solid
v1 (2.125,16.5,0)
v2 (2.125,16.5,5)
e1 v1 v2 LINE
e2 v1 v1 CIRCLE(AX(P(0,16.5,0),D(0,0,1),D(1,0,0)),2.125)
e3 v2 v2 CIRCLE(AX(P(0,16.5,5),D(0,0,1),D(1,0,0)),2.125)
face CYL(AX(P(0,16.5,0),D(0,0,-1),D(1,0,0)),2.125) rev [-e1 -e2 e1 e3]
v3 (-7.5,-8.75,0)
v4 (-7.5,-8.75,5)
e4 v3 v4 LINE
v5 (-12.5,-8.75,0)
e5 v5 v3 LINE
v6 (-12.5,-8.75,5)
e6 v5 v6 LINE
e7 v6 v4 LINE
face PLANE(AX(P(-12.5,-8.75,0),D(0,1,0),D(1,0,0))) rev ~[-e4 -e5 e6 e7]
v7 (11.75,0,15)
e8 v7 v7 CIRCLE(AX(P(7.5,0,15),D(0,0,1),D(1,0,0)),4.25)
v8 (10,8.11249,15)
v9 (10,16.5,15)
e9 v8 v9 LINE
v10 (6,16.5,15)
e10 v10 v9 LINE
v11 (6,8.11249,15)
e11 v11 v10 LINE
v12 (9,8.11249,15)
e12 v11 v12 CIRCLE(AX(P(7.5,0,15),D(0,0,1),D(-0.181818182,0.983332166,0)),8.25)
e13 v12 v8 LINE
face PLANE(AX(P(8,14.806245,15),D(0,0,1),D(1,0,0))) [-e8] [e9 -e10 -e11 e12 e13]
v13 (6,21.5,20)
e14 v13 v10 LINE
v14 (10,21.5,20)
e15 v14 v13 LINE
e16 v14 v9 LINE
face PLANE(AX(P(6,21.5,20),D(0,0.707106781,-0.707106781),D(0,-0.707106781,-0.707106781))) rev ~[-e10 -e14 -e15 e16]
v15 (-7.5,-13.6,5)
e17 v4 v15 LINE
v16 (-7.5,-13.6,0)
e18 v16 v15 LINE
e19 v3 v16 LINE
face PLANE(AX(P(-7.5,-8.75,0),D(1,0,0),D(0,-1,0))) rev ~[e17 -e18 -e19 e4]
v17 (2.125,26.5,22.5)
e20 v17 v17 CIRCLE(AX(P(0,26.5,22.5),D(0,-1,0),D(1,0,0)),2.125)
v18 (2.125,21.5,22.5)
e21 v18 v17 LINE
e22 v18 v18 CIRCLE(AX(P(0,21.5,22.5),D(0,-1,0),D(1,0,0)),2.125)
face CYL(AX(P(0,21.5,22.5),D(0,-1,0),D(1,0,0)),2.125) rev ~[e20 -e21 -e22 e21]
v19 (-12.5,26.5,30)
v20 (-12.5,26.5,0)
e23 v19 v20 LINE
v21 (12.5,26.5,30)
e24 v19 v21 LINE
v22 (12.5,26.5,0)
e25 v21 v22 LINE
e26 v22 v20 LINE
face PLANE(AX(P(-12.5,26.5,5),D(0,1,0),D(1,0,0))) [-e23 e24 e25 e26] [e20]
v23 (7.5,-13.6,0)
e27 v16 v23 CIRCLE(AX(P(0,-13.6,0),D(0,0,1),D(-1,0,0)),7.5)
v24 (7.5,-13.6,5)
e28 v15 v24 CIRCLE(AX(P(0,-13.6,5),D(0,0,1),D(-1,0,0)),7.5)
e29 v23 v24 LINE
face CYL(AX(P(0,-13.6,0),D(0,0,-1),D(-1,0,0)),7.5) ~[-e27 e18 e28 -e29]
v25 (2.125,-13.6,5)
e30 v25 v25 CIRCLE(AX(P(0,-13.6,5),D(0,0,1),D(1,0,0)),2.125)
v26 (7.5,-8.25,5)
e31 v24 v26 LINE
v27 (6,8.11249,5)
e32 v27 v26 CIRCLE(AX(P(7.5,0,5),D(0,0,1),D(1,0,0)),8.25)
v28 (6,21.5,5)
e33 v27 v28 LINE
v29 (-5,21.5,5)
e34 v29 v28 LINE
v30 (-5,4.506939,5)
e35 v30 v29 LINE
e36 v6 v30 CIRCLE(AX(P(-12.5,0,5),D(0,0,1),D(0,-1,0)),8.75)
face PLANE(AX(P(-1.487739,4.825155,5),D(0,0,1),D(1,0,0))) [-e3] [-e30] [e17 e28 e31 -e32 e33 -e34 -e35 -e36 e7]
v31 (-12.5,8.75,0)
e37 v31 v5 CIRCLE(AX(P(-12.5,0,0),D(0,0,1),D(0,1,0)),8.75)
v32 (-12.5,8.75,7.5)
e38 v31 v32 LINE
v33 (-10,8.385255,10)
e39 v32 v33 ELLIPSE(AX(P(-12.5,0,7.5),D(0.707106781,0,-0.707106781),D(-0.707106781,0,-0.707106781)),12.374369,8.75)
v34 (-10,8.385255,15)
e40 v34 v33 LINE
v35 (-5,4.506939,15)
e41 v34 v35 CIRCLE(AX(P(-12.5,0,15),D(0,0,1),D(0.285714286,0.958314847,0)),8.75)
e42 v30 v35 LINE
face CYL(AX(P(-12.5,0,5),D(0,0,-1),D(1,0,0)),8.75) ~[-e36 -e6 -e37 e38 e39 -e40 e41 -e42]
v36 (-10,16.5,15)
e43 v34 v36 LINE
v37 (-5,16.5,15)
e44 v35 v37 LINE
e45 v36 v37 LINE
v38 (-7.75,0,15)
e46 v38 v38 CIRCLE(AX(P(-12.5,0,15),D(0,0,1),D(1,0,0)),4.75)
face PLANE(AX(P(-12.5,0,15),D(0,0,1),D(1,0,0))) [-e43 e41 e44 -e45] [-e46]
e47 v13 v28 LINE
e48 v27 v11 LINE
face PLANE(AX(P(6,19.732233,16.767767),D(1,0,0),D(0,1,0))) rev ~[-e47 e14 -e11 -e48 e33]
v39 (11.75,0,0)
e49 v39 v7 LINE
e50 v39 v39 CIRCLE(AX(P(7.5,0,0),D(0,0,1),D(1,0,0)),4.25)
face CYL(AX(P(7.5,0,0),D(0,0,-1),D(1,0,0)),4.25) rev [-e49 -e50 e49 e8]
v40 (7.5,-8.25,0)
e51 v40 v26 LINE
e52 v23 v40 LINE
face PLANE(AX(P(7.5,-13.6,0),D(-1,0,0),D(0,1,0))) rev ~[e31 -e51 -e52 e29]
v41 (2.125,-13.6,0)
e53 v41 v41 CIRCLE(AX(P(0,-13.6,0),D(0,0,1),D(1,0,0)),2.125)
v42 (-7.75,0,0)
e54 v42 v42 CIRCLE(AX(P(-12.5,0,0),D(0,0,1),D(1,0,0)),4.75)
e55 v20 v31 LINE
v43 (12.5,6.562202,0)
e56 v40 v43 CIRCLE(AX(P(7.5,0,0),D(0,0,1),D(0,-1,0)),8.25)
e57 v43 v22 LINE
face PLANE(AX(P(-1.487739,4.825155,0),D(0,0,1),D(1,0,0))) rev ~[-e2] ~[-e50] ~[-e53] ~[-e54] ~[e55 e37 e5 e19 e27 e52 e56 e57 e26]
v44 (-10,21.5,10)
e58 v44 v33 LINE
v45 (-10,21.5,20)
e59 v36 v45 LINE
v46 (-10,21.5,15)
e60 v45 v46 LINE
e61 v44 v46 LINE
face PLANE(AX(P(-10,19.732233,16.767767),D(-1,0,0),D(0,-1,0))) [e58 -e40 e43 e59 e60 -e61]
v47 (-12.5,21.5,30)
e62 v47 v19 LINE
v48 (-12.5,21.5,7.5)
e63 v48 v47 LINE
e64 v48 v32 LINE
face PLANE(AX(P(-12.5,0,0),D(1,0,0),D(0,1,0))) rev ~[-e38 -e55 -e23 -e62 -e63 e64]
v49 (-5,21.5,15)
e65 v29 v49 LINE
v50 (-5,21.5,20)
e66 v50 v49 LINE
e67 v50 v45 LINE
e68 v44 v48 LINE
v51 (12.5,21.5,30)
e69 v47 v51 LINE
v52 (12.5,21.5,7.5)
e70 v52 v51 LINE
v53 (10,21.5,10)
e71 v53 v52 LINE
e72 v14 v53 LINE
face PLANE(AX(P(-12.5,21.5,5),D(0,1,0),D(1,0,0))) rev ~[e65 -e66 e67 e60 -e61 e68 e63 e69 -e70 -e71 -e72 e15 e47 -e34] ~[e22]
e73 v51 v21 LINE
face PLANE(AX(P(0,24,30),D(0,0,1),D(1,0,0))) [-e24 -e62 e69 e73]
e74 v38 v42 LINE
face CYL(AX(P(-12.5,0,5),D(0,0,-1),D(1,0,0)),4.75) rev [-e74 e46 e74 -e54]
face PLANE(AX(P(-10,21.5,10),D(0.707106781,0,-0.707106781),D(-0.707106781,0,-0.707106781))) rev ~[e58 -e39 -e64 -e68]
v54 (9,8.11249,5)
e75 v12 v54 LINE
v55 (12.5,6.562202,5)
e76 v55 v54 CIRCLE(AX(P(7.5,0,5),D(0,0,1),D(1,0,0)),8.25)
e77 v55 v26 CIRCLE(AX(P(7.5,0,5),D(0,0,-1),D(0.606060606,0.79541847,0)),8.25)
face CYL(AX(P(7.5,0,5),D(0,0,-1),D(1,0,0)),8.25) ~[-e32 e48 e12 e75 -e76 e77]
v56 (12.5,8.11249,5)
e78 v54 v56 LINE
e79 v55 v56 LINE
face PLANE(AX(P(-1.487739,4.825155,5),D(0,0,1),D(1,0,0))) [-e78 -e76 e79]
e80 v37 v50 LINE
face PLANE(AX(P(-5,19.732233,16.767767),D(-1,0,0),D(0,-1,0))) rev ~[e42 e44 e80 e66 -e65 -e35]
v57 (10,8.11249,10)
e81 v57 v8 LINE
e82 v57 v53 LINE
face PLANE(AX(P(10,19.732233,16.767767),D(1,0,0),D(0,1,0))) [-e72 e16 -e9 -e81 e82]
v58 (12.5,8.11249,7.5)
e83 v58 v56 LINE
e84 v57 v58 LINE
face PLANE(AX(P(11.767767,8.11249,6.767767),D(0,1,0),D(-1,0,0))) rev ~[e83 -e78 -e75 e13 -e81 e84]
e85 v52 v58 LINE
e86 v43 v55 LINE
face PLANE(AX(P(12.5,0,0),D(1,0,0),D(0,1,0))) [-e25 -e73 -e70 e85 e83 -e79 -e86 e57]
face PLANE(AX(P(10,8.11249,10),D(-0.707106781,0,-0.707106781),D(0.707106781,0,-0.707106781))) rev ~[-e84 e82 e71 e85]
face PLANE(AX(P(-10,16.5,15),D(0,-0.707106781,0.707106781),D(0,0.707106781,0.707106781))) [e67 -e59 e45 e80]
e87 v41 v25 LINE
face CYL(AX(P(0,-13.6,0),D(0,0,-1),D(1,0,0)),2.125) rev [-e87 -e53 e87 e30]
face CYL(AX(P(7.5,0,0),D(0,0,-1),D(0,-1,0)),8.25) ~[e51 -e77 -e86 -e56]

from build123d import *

# Parameters (mm, degrees)
F0_R          = 4.75
F0_R_2        = 2.125
F0_R_3        = 4.25
F1_DEPTH      = 5
F2_W          = 25
F2_H          = 5
F3_DEPTH      = 25
F4_R          = 8.75
F4_R_2        = 4.75
F4_R_3        = 8.25
F4_R_4        = 4.25
F5_DEPTH      = 10
F6_R          = 2.125
F7_DEPTH      = 5.001
F8_W          = 5
F8_H          = 16.9930609057
F8_W_2        = 4
F8_H_2        = 13.3875096302
F9_DEPTH      = 10
F10_T1_DEPTH  = 5
F10_T3_DEPTH  = 4
F10_T8_DEPTH  = 30.7168298797
F10_T13_DEPTH = 29.7168298797
F10_T18_DEPTH = 25.9731600242
F10_S20_R     = 4.75
F10_T21_DEPTH = 15
F10_T25_DEPTH = 13.3875096302


# Not quite as in the source:
# - a fillet or chamfer that OpenCascade refuses, or shapes differently, is made with other operations: its cross-section is extruded or revolved along the edge and cut away or added


with BuildPart() as f1:
    # F0 (on Top) → F1 (new body)
    with BuildSketch(Plane.XY):
        with BuildLine():
            Line((12.5, 26.5), (0, 26.5))
            Line((0, 26.5), (-12.5, 26.5))
            Line((-12.5, 26.5), (-12.5, 8.75))
            ThreePointArc((-12.5, 8.75), (-21.25, 0), (-12.5, -8.75))
            Line((-12.5, -8.75), (-7.5, -8.75))
            Line((-7.5, -8.75), (-7.5, -13.6))
            ThreePointArc((-7.5, -13.6), (-5.3033008589, -18.9033008589), (0, -21.1))
            ThreePointArc((0, -21.1), (5.3033008589, -18.9033008589), (7.5, -13.6))
            Line((7.5, -13.6), (7.5, -8.25))
            ThreePointArc((7.5, -8.25), (15.3166703137, -2.6385915194), (12.5, 6.5622023742))
            Line((12.5, 6.5622023742), (12.5, 26.5))
        make_face()
        with Locations((-12.5, 0)):
            Circle(F0_R, mode=Mode.SUBTRACT)
        with Locations((0, -13.6)):
            Circle(F0_R_2, mode=Mode.SUBTRACT)
        with Locations((7.5, 0)):
            Circle(F0_R_3, mode=Mode.SUBTRACT)
        with Locations((0, 16.5)):
            Circle(F0_R_2, mode=Mode.SUBTRACT)
    extrude(amount=F1_DEPTH)

    # F2 (on face) → F3 (join)
    with BuildSketch(Plane.XY.offset(5)):
        with Locations((0, 24)):
            Rectangle(F2_W, F2_H)
    extrude(amount=F3_DEPTH)

    # F4 (on face) → F5 (join)
    with BuildSketch(Plane.XY.offset(5)):
        with Locations((-12.5, 0)):
            Circle(F4_R)
        with Locations((-12.5, 0)):
            Circle(F4_R_2, mode=Mode.SUBTRACT)
        with Locations((7.5, 0)):
            Circle(F4_R_3)
        with Locations((7.5, 0)):
            Circle(F4_R_4, mode=Mode.SUBTRACT)
    extrude(amount=F5_DEPTH)

    # F6 (on face) → F7 (cut, through all)
    with BuildSketch(Plane.XZ.offset(-21.5)):
        with Locations((0, 22.5)):
            Circle(F6_R)
    extrude(amount=-F7_DEPTH, mode=Mode.SUBTRACT)

    # F8 (on face) → F9 (join)
    with BuildSketch(Plane.XY.offset(5)):
        with Locations((-7.5, 13.0034695472)):
            Rectangle(F8_W, F8_H)
        with Locations((8, 14.8062451849)):
            Rectangle(F8_W_2, F8_H_2)
    extrude(amount=F9_DEPTH)

    # F10: chamfer of 5 on 4 edges, made by hand

    # F10_s2 → F10_t1 (join)
    with BuildSketch(Plane.YZ.offset(-10)):
        Polygon((16.5, 15), (21.5, 20), (21.5, 15), align=None)
    extrude(amount=F10_T1_DEPTH)

    # F10_s4 → F10_t3 (join)
    with BuildSketch(Plane.YZ.offset(6)):
        Polygon((21.5, 20), (16.5, 15), (21.5, 15), align=None)
    extrude(amount=F10_T3_DEPTH)


with BuildPart() as f10_tool6:
    # F10_s7 → F10_t8 (new body)
    with BuildSketch(Plane.YZ.offset(7.8584149398)):
        Polygon((16.5, 15), (21.5, 20), (21.5, 15), align=None)
    extrude(amount=-F10_T8_DEPTH)

    split(bisect_by=Plane.YZ.offset(6), keep=Keep.TOP)


with BuildPart() as f1_1:
    add(f1.part)

    # F10_t5: union F10_tool6
    add(f10_tool6.part)


with BuildPart() as f10_tool11:
    # F10_s12 → F10_t13 (new body)
    with BuildSketch(Plane.YZ.offset(22.8584149398)):
        Polygon((21.5, 20), (16.5, 15), (21.5, 15), align=None)
    extrude(amount=-F10_T13_DEPTH)

    split(bisect_by=Plane.YZ.offset(-5), keep=Keep.BOTTOM)


with BuildPart() as f1_2:
    add(f1_1.part)

    # F10_t10: union F10_tool11
    add(f10_tool11.part)


with BuildPart() as f10_tool16:
    # F10_s17 → F10_t18 (new body)
    with BuildSketch(Plane.XZ.offset(-21.5)):
        Polygon((-10, 10), (-15, 5), (-10, 5), align=None)
    extrude(amount=F10_T18_DEPTH)

    split(bisect_by=Plane.YZ.offset(-12.5), keep=Keep.TOP)

    # F10_s20 → F10_t21 (cut, symmetric)
    with BuildSketch(Plane.XY.offset(7.5)):
        with Locations((-12.5, 0)):
            Circle(F10_S20_R)
    extrude(amount=F10_T21_DEPTH, both=True, mode=Mode.SUBTRACT)


with BuildPart() as f1_3:
    add(f1_2.part)

    # F10_t15: union F10_tool16
    add(f10_tool16.part)


with BuildPart() as f10_tool23:
    # F10_s24 → F10_t25 (new body)
    with BuildSketch(Plane.XZ.offset(-8.1124903698)):
        Polygon((10, 10), (15, 5), (10, 5), align=None)
    extrude(amount=-F10_T25_DEPTH)

    split(bisect_by=Plane.YZ.offset(12.5), keep=Keep.BOTTOM)


with BuildPart() as f1_4:
    add(f1_3.part)

    # F10_t22: union F10_tool23
    add(f10_tool23.part)


solid = f1_4.part
